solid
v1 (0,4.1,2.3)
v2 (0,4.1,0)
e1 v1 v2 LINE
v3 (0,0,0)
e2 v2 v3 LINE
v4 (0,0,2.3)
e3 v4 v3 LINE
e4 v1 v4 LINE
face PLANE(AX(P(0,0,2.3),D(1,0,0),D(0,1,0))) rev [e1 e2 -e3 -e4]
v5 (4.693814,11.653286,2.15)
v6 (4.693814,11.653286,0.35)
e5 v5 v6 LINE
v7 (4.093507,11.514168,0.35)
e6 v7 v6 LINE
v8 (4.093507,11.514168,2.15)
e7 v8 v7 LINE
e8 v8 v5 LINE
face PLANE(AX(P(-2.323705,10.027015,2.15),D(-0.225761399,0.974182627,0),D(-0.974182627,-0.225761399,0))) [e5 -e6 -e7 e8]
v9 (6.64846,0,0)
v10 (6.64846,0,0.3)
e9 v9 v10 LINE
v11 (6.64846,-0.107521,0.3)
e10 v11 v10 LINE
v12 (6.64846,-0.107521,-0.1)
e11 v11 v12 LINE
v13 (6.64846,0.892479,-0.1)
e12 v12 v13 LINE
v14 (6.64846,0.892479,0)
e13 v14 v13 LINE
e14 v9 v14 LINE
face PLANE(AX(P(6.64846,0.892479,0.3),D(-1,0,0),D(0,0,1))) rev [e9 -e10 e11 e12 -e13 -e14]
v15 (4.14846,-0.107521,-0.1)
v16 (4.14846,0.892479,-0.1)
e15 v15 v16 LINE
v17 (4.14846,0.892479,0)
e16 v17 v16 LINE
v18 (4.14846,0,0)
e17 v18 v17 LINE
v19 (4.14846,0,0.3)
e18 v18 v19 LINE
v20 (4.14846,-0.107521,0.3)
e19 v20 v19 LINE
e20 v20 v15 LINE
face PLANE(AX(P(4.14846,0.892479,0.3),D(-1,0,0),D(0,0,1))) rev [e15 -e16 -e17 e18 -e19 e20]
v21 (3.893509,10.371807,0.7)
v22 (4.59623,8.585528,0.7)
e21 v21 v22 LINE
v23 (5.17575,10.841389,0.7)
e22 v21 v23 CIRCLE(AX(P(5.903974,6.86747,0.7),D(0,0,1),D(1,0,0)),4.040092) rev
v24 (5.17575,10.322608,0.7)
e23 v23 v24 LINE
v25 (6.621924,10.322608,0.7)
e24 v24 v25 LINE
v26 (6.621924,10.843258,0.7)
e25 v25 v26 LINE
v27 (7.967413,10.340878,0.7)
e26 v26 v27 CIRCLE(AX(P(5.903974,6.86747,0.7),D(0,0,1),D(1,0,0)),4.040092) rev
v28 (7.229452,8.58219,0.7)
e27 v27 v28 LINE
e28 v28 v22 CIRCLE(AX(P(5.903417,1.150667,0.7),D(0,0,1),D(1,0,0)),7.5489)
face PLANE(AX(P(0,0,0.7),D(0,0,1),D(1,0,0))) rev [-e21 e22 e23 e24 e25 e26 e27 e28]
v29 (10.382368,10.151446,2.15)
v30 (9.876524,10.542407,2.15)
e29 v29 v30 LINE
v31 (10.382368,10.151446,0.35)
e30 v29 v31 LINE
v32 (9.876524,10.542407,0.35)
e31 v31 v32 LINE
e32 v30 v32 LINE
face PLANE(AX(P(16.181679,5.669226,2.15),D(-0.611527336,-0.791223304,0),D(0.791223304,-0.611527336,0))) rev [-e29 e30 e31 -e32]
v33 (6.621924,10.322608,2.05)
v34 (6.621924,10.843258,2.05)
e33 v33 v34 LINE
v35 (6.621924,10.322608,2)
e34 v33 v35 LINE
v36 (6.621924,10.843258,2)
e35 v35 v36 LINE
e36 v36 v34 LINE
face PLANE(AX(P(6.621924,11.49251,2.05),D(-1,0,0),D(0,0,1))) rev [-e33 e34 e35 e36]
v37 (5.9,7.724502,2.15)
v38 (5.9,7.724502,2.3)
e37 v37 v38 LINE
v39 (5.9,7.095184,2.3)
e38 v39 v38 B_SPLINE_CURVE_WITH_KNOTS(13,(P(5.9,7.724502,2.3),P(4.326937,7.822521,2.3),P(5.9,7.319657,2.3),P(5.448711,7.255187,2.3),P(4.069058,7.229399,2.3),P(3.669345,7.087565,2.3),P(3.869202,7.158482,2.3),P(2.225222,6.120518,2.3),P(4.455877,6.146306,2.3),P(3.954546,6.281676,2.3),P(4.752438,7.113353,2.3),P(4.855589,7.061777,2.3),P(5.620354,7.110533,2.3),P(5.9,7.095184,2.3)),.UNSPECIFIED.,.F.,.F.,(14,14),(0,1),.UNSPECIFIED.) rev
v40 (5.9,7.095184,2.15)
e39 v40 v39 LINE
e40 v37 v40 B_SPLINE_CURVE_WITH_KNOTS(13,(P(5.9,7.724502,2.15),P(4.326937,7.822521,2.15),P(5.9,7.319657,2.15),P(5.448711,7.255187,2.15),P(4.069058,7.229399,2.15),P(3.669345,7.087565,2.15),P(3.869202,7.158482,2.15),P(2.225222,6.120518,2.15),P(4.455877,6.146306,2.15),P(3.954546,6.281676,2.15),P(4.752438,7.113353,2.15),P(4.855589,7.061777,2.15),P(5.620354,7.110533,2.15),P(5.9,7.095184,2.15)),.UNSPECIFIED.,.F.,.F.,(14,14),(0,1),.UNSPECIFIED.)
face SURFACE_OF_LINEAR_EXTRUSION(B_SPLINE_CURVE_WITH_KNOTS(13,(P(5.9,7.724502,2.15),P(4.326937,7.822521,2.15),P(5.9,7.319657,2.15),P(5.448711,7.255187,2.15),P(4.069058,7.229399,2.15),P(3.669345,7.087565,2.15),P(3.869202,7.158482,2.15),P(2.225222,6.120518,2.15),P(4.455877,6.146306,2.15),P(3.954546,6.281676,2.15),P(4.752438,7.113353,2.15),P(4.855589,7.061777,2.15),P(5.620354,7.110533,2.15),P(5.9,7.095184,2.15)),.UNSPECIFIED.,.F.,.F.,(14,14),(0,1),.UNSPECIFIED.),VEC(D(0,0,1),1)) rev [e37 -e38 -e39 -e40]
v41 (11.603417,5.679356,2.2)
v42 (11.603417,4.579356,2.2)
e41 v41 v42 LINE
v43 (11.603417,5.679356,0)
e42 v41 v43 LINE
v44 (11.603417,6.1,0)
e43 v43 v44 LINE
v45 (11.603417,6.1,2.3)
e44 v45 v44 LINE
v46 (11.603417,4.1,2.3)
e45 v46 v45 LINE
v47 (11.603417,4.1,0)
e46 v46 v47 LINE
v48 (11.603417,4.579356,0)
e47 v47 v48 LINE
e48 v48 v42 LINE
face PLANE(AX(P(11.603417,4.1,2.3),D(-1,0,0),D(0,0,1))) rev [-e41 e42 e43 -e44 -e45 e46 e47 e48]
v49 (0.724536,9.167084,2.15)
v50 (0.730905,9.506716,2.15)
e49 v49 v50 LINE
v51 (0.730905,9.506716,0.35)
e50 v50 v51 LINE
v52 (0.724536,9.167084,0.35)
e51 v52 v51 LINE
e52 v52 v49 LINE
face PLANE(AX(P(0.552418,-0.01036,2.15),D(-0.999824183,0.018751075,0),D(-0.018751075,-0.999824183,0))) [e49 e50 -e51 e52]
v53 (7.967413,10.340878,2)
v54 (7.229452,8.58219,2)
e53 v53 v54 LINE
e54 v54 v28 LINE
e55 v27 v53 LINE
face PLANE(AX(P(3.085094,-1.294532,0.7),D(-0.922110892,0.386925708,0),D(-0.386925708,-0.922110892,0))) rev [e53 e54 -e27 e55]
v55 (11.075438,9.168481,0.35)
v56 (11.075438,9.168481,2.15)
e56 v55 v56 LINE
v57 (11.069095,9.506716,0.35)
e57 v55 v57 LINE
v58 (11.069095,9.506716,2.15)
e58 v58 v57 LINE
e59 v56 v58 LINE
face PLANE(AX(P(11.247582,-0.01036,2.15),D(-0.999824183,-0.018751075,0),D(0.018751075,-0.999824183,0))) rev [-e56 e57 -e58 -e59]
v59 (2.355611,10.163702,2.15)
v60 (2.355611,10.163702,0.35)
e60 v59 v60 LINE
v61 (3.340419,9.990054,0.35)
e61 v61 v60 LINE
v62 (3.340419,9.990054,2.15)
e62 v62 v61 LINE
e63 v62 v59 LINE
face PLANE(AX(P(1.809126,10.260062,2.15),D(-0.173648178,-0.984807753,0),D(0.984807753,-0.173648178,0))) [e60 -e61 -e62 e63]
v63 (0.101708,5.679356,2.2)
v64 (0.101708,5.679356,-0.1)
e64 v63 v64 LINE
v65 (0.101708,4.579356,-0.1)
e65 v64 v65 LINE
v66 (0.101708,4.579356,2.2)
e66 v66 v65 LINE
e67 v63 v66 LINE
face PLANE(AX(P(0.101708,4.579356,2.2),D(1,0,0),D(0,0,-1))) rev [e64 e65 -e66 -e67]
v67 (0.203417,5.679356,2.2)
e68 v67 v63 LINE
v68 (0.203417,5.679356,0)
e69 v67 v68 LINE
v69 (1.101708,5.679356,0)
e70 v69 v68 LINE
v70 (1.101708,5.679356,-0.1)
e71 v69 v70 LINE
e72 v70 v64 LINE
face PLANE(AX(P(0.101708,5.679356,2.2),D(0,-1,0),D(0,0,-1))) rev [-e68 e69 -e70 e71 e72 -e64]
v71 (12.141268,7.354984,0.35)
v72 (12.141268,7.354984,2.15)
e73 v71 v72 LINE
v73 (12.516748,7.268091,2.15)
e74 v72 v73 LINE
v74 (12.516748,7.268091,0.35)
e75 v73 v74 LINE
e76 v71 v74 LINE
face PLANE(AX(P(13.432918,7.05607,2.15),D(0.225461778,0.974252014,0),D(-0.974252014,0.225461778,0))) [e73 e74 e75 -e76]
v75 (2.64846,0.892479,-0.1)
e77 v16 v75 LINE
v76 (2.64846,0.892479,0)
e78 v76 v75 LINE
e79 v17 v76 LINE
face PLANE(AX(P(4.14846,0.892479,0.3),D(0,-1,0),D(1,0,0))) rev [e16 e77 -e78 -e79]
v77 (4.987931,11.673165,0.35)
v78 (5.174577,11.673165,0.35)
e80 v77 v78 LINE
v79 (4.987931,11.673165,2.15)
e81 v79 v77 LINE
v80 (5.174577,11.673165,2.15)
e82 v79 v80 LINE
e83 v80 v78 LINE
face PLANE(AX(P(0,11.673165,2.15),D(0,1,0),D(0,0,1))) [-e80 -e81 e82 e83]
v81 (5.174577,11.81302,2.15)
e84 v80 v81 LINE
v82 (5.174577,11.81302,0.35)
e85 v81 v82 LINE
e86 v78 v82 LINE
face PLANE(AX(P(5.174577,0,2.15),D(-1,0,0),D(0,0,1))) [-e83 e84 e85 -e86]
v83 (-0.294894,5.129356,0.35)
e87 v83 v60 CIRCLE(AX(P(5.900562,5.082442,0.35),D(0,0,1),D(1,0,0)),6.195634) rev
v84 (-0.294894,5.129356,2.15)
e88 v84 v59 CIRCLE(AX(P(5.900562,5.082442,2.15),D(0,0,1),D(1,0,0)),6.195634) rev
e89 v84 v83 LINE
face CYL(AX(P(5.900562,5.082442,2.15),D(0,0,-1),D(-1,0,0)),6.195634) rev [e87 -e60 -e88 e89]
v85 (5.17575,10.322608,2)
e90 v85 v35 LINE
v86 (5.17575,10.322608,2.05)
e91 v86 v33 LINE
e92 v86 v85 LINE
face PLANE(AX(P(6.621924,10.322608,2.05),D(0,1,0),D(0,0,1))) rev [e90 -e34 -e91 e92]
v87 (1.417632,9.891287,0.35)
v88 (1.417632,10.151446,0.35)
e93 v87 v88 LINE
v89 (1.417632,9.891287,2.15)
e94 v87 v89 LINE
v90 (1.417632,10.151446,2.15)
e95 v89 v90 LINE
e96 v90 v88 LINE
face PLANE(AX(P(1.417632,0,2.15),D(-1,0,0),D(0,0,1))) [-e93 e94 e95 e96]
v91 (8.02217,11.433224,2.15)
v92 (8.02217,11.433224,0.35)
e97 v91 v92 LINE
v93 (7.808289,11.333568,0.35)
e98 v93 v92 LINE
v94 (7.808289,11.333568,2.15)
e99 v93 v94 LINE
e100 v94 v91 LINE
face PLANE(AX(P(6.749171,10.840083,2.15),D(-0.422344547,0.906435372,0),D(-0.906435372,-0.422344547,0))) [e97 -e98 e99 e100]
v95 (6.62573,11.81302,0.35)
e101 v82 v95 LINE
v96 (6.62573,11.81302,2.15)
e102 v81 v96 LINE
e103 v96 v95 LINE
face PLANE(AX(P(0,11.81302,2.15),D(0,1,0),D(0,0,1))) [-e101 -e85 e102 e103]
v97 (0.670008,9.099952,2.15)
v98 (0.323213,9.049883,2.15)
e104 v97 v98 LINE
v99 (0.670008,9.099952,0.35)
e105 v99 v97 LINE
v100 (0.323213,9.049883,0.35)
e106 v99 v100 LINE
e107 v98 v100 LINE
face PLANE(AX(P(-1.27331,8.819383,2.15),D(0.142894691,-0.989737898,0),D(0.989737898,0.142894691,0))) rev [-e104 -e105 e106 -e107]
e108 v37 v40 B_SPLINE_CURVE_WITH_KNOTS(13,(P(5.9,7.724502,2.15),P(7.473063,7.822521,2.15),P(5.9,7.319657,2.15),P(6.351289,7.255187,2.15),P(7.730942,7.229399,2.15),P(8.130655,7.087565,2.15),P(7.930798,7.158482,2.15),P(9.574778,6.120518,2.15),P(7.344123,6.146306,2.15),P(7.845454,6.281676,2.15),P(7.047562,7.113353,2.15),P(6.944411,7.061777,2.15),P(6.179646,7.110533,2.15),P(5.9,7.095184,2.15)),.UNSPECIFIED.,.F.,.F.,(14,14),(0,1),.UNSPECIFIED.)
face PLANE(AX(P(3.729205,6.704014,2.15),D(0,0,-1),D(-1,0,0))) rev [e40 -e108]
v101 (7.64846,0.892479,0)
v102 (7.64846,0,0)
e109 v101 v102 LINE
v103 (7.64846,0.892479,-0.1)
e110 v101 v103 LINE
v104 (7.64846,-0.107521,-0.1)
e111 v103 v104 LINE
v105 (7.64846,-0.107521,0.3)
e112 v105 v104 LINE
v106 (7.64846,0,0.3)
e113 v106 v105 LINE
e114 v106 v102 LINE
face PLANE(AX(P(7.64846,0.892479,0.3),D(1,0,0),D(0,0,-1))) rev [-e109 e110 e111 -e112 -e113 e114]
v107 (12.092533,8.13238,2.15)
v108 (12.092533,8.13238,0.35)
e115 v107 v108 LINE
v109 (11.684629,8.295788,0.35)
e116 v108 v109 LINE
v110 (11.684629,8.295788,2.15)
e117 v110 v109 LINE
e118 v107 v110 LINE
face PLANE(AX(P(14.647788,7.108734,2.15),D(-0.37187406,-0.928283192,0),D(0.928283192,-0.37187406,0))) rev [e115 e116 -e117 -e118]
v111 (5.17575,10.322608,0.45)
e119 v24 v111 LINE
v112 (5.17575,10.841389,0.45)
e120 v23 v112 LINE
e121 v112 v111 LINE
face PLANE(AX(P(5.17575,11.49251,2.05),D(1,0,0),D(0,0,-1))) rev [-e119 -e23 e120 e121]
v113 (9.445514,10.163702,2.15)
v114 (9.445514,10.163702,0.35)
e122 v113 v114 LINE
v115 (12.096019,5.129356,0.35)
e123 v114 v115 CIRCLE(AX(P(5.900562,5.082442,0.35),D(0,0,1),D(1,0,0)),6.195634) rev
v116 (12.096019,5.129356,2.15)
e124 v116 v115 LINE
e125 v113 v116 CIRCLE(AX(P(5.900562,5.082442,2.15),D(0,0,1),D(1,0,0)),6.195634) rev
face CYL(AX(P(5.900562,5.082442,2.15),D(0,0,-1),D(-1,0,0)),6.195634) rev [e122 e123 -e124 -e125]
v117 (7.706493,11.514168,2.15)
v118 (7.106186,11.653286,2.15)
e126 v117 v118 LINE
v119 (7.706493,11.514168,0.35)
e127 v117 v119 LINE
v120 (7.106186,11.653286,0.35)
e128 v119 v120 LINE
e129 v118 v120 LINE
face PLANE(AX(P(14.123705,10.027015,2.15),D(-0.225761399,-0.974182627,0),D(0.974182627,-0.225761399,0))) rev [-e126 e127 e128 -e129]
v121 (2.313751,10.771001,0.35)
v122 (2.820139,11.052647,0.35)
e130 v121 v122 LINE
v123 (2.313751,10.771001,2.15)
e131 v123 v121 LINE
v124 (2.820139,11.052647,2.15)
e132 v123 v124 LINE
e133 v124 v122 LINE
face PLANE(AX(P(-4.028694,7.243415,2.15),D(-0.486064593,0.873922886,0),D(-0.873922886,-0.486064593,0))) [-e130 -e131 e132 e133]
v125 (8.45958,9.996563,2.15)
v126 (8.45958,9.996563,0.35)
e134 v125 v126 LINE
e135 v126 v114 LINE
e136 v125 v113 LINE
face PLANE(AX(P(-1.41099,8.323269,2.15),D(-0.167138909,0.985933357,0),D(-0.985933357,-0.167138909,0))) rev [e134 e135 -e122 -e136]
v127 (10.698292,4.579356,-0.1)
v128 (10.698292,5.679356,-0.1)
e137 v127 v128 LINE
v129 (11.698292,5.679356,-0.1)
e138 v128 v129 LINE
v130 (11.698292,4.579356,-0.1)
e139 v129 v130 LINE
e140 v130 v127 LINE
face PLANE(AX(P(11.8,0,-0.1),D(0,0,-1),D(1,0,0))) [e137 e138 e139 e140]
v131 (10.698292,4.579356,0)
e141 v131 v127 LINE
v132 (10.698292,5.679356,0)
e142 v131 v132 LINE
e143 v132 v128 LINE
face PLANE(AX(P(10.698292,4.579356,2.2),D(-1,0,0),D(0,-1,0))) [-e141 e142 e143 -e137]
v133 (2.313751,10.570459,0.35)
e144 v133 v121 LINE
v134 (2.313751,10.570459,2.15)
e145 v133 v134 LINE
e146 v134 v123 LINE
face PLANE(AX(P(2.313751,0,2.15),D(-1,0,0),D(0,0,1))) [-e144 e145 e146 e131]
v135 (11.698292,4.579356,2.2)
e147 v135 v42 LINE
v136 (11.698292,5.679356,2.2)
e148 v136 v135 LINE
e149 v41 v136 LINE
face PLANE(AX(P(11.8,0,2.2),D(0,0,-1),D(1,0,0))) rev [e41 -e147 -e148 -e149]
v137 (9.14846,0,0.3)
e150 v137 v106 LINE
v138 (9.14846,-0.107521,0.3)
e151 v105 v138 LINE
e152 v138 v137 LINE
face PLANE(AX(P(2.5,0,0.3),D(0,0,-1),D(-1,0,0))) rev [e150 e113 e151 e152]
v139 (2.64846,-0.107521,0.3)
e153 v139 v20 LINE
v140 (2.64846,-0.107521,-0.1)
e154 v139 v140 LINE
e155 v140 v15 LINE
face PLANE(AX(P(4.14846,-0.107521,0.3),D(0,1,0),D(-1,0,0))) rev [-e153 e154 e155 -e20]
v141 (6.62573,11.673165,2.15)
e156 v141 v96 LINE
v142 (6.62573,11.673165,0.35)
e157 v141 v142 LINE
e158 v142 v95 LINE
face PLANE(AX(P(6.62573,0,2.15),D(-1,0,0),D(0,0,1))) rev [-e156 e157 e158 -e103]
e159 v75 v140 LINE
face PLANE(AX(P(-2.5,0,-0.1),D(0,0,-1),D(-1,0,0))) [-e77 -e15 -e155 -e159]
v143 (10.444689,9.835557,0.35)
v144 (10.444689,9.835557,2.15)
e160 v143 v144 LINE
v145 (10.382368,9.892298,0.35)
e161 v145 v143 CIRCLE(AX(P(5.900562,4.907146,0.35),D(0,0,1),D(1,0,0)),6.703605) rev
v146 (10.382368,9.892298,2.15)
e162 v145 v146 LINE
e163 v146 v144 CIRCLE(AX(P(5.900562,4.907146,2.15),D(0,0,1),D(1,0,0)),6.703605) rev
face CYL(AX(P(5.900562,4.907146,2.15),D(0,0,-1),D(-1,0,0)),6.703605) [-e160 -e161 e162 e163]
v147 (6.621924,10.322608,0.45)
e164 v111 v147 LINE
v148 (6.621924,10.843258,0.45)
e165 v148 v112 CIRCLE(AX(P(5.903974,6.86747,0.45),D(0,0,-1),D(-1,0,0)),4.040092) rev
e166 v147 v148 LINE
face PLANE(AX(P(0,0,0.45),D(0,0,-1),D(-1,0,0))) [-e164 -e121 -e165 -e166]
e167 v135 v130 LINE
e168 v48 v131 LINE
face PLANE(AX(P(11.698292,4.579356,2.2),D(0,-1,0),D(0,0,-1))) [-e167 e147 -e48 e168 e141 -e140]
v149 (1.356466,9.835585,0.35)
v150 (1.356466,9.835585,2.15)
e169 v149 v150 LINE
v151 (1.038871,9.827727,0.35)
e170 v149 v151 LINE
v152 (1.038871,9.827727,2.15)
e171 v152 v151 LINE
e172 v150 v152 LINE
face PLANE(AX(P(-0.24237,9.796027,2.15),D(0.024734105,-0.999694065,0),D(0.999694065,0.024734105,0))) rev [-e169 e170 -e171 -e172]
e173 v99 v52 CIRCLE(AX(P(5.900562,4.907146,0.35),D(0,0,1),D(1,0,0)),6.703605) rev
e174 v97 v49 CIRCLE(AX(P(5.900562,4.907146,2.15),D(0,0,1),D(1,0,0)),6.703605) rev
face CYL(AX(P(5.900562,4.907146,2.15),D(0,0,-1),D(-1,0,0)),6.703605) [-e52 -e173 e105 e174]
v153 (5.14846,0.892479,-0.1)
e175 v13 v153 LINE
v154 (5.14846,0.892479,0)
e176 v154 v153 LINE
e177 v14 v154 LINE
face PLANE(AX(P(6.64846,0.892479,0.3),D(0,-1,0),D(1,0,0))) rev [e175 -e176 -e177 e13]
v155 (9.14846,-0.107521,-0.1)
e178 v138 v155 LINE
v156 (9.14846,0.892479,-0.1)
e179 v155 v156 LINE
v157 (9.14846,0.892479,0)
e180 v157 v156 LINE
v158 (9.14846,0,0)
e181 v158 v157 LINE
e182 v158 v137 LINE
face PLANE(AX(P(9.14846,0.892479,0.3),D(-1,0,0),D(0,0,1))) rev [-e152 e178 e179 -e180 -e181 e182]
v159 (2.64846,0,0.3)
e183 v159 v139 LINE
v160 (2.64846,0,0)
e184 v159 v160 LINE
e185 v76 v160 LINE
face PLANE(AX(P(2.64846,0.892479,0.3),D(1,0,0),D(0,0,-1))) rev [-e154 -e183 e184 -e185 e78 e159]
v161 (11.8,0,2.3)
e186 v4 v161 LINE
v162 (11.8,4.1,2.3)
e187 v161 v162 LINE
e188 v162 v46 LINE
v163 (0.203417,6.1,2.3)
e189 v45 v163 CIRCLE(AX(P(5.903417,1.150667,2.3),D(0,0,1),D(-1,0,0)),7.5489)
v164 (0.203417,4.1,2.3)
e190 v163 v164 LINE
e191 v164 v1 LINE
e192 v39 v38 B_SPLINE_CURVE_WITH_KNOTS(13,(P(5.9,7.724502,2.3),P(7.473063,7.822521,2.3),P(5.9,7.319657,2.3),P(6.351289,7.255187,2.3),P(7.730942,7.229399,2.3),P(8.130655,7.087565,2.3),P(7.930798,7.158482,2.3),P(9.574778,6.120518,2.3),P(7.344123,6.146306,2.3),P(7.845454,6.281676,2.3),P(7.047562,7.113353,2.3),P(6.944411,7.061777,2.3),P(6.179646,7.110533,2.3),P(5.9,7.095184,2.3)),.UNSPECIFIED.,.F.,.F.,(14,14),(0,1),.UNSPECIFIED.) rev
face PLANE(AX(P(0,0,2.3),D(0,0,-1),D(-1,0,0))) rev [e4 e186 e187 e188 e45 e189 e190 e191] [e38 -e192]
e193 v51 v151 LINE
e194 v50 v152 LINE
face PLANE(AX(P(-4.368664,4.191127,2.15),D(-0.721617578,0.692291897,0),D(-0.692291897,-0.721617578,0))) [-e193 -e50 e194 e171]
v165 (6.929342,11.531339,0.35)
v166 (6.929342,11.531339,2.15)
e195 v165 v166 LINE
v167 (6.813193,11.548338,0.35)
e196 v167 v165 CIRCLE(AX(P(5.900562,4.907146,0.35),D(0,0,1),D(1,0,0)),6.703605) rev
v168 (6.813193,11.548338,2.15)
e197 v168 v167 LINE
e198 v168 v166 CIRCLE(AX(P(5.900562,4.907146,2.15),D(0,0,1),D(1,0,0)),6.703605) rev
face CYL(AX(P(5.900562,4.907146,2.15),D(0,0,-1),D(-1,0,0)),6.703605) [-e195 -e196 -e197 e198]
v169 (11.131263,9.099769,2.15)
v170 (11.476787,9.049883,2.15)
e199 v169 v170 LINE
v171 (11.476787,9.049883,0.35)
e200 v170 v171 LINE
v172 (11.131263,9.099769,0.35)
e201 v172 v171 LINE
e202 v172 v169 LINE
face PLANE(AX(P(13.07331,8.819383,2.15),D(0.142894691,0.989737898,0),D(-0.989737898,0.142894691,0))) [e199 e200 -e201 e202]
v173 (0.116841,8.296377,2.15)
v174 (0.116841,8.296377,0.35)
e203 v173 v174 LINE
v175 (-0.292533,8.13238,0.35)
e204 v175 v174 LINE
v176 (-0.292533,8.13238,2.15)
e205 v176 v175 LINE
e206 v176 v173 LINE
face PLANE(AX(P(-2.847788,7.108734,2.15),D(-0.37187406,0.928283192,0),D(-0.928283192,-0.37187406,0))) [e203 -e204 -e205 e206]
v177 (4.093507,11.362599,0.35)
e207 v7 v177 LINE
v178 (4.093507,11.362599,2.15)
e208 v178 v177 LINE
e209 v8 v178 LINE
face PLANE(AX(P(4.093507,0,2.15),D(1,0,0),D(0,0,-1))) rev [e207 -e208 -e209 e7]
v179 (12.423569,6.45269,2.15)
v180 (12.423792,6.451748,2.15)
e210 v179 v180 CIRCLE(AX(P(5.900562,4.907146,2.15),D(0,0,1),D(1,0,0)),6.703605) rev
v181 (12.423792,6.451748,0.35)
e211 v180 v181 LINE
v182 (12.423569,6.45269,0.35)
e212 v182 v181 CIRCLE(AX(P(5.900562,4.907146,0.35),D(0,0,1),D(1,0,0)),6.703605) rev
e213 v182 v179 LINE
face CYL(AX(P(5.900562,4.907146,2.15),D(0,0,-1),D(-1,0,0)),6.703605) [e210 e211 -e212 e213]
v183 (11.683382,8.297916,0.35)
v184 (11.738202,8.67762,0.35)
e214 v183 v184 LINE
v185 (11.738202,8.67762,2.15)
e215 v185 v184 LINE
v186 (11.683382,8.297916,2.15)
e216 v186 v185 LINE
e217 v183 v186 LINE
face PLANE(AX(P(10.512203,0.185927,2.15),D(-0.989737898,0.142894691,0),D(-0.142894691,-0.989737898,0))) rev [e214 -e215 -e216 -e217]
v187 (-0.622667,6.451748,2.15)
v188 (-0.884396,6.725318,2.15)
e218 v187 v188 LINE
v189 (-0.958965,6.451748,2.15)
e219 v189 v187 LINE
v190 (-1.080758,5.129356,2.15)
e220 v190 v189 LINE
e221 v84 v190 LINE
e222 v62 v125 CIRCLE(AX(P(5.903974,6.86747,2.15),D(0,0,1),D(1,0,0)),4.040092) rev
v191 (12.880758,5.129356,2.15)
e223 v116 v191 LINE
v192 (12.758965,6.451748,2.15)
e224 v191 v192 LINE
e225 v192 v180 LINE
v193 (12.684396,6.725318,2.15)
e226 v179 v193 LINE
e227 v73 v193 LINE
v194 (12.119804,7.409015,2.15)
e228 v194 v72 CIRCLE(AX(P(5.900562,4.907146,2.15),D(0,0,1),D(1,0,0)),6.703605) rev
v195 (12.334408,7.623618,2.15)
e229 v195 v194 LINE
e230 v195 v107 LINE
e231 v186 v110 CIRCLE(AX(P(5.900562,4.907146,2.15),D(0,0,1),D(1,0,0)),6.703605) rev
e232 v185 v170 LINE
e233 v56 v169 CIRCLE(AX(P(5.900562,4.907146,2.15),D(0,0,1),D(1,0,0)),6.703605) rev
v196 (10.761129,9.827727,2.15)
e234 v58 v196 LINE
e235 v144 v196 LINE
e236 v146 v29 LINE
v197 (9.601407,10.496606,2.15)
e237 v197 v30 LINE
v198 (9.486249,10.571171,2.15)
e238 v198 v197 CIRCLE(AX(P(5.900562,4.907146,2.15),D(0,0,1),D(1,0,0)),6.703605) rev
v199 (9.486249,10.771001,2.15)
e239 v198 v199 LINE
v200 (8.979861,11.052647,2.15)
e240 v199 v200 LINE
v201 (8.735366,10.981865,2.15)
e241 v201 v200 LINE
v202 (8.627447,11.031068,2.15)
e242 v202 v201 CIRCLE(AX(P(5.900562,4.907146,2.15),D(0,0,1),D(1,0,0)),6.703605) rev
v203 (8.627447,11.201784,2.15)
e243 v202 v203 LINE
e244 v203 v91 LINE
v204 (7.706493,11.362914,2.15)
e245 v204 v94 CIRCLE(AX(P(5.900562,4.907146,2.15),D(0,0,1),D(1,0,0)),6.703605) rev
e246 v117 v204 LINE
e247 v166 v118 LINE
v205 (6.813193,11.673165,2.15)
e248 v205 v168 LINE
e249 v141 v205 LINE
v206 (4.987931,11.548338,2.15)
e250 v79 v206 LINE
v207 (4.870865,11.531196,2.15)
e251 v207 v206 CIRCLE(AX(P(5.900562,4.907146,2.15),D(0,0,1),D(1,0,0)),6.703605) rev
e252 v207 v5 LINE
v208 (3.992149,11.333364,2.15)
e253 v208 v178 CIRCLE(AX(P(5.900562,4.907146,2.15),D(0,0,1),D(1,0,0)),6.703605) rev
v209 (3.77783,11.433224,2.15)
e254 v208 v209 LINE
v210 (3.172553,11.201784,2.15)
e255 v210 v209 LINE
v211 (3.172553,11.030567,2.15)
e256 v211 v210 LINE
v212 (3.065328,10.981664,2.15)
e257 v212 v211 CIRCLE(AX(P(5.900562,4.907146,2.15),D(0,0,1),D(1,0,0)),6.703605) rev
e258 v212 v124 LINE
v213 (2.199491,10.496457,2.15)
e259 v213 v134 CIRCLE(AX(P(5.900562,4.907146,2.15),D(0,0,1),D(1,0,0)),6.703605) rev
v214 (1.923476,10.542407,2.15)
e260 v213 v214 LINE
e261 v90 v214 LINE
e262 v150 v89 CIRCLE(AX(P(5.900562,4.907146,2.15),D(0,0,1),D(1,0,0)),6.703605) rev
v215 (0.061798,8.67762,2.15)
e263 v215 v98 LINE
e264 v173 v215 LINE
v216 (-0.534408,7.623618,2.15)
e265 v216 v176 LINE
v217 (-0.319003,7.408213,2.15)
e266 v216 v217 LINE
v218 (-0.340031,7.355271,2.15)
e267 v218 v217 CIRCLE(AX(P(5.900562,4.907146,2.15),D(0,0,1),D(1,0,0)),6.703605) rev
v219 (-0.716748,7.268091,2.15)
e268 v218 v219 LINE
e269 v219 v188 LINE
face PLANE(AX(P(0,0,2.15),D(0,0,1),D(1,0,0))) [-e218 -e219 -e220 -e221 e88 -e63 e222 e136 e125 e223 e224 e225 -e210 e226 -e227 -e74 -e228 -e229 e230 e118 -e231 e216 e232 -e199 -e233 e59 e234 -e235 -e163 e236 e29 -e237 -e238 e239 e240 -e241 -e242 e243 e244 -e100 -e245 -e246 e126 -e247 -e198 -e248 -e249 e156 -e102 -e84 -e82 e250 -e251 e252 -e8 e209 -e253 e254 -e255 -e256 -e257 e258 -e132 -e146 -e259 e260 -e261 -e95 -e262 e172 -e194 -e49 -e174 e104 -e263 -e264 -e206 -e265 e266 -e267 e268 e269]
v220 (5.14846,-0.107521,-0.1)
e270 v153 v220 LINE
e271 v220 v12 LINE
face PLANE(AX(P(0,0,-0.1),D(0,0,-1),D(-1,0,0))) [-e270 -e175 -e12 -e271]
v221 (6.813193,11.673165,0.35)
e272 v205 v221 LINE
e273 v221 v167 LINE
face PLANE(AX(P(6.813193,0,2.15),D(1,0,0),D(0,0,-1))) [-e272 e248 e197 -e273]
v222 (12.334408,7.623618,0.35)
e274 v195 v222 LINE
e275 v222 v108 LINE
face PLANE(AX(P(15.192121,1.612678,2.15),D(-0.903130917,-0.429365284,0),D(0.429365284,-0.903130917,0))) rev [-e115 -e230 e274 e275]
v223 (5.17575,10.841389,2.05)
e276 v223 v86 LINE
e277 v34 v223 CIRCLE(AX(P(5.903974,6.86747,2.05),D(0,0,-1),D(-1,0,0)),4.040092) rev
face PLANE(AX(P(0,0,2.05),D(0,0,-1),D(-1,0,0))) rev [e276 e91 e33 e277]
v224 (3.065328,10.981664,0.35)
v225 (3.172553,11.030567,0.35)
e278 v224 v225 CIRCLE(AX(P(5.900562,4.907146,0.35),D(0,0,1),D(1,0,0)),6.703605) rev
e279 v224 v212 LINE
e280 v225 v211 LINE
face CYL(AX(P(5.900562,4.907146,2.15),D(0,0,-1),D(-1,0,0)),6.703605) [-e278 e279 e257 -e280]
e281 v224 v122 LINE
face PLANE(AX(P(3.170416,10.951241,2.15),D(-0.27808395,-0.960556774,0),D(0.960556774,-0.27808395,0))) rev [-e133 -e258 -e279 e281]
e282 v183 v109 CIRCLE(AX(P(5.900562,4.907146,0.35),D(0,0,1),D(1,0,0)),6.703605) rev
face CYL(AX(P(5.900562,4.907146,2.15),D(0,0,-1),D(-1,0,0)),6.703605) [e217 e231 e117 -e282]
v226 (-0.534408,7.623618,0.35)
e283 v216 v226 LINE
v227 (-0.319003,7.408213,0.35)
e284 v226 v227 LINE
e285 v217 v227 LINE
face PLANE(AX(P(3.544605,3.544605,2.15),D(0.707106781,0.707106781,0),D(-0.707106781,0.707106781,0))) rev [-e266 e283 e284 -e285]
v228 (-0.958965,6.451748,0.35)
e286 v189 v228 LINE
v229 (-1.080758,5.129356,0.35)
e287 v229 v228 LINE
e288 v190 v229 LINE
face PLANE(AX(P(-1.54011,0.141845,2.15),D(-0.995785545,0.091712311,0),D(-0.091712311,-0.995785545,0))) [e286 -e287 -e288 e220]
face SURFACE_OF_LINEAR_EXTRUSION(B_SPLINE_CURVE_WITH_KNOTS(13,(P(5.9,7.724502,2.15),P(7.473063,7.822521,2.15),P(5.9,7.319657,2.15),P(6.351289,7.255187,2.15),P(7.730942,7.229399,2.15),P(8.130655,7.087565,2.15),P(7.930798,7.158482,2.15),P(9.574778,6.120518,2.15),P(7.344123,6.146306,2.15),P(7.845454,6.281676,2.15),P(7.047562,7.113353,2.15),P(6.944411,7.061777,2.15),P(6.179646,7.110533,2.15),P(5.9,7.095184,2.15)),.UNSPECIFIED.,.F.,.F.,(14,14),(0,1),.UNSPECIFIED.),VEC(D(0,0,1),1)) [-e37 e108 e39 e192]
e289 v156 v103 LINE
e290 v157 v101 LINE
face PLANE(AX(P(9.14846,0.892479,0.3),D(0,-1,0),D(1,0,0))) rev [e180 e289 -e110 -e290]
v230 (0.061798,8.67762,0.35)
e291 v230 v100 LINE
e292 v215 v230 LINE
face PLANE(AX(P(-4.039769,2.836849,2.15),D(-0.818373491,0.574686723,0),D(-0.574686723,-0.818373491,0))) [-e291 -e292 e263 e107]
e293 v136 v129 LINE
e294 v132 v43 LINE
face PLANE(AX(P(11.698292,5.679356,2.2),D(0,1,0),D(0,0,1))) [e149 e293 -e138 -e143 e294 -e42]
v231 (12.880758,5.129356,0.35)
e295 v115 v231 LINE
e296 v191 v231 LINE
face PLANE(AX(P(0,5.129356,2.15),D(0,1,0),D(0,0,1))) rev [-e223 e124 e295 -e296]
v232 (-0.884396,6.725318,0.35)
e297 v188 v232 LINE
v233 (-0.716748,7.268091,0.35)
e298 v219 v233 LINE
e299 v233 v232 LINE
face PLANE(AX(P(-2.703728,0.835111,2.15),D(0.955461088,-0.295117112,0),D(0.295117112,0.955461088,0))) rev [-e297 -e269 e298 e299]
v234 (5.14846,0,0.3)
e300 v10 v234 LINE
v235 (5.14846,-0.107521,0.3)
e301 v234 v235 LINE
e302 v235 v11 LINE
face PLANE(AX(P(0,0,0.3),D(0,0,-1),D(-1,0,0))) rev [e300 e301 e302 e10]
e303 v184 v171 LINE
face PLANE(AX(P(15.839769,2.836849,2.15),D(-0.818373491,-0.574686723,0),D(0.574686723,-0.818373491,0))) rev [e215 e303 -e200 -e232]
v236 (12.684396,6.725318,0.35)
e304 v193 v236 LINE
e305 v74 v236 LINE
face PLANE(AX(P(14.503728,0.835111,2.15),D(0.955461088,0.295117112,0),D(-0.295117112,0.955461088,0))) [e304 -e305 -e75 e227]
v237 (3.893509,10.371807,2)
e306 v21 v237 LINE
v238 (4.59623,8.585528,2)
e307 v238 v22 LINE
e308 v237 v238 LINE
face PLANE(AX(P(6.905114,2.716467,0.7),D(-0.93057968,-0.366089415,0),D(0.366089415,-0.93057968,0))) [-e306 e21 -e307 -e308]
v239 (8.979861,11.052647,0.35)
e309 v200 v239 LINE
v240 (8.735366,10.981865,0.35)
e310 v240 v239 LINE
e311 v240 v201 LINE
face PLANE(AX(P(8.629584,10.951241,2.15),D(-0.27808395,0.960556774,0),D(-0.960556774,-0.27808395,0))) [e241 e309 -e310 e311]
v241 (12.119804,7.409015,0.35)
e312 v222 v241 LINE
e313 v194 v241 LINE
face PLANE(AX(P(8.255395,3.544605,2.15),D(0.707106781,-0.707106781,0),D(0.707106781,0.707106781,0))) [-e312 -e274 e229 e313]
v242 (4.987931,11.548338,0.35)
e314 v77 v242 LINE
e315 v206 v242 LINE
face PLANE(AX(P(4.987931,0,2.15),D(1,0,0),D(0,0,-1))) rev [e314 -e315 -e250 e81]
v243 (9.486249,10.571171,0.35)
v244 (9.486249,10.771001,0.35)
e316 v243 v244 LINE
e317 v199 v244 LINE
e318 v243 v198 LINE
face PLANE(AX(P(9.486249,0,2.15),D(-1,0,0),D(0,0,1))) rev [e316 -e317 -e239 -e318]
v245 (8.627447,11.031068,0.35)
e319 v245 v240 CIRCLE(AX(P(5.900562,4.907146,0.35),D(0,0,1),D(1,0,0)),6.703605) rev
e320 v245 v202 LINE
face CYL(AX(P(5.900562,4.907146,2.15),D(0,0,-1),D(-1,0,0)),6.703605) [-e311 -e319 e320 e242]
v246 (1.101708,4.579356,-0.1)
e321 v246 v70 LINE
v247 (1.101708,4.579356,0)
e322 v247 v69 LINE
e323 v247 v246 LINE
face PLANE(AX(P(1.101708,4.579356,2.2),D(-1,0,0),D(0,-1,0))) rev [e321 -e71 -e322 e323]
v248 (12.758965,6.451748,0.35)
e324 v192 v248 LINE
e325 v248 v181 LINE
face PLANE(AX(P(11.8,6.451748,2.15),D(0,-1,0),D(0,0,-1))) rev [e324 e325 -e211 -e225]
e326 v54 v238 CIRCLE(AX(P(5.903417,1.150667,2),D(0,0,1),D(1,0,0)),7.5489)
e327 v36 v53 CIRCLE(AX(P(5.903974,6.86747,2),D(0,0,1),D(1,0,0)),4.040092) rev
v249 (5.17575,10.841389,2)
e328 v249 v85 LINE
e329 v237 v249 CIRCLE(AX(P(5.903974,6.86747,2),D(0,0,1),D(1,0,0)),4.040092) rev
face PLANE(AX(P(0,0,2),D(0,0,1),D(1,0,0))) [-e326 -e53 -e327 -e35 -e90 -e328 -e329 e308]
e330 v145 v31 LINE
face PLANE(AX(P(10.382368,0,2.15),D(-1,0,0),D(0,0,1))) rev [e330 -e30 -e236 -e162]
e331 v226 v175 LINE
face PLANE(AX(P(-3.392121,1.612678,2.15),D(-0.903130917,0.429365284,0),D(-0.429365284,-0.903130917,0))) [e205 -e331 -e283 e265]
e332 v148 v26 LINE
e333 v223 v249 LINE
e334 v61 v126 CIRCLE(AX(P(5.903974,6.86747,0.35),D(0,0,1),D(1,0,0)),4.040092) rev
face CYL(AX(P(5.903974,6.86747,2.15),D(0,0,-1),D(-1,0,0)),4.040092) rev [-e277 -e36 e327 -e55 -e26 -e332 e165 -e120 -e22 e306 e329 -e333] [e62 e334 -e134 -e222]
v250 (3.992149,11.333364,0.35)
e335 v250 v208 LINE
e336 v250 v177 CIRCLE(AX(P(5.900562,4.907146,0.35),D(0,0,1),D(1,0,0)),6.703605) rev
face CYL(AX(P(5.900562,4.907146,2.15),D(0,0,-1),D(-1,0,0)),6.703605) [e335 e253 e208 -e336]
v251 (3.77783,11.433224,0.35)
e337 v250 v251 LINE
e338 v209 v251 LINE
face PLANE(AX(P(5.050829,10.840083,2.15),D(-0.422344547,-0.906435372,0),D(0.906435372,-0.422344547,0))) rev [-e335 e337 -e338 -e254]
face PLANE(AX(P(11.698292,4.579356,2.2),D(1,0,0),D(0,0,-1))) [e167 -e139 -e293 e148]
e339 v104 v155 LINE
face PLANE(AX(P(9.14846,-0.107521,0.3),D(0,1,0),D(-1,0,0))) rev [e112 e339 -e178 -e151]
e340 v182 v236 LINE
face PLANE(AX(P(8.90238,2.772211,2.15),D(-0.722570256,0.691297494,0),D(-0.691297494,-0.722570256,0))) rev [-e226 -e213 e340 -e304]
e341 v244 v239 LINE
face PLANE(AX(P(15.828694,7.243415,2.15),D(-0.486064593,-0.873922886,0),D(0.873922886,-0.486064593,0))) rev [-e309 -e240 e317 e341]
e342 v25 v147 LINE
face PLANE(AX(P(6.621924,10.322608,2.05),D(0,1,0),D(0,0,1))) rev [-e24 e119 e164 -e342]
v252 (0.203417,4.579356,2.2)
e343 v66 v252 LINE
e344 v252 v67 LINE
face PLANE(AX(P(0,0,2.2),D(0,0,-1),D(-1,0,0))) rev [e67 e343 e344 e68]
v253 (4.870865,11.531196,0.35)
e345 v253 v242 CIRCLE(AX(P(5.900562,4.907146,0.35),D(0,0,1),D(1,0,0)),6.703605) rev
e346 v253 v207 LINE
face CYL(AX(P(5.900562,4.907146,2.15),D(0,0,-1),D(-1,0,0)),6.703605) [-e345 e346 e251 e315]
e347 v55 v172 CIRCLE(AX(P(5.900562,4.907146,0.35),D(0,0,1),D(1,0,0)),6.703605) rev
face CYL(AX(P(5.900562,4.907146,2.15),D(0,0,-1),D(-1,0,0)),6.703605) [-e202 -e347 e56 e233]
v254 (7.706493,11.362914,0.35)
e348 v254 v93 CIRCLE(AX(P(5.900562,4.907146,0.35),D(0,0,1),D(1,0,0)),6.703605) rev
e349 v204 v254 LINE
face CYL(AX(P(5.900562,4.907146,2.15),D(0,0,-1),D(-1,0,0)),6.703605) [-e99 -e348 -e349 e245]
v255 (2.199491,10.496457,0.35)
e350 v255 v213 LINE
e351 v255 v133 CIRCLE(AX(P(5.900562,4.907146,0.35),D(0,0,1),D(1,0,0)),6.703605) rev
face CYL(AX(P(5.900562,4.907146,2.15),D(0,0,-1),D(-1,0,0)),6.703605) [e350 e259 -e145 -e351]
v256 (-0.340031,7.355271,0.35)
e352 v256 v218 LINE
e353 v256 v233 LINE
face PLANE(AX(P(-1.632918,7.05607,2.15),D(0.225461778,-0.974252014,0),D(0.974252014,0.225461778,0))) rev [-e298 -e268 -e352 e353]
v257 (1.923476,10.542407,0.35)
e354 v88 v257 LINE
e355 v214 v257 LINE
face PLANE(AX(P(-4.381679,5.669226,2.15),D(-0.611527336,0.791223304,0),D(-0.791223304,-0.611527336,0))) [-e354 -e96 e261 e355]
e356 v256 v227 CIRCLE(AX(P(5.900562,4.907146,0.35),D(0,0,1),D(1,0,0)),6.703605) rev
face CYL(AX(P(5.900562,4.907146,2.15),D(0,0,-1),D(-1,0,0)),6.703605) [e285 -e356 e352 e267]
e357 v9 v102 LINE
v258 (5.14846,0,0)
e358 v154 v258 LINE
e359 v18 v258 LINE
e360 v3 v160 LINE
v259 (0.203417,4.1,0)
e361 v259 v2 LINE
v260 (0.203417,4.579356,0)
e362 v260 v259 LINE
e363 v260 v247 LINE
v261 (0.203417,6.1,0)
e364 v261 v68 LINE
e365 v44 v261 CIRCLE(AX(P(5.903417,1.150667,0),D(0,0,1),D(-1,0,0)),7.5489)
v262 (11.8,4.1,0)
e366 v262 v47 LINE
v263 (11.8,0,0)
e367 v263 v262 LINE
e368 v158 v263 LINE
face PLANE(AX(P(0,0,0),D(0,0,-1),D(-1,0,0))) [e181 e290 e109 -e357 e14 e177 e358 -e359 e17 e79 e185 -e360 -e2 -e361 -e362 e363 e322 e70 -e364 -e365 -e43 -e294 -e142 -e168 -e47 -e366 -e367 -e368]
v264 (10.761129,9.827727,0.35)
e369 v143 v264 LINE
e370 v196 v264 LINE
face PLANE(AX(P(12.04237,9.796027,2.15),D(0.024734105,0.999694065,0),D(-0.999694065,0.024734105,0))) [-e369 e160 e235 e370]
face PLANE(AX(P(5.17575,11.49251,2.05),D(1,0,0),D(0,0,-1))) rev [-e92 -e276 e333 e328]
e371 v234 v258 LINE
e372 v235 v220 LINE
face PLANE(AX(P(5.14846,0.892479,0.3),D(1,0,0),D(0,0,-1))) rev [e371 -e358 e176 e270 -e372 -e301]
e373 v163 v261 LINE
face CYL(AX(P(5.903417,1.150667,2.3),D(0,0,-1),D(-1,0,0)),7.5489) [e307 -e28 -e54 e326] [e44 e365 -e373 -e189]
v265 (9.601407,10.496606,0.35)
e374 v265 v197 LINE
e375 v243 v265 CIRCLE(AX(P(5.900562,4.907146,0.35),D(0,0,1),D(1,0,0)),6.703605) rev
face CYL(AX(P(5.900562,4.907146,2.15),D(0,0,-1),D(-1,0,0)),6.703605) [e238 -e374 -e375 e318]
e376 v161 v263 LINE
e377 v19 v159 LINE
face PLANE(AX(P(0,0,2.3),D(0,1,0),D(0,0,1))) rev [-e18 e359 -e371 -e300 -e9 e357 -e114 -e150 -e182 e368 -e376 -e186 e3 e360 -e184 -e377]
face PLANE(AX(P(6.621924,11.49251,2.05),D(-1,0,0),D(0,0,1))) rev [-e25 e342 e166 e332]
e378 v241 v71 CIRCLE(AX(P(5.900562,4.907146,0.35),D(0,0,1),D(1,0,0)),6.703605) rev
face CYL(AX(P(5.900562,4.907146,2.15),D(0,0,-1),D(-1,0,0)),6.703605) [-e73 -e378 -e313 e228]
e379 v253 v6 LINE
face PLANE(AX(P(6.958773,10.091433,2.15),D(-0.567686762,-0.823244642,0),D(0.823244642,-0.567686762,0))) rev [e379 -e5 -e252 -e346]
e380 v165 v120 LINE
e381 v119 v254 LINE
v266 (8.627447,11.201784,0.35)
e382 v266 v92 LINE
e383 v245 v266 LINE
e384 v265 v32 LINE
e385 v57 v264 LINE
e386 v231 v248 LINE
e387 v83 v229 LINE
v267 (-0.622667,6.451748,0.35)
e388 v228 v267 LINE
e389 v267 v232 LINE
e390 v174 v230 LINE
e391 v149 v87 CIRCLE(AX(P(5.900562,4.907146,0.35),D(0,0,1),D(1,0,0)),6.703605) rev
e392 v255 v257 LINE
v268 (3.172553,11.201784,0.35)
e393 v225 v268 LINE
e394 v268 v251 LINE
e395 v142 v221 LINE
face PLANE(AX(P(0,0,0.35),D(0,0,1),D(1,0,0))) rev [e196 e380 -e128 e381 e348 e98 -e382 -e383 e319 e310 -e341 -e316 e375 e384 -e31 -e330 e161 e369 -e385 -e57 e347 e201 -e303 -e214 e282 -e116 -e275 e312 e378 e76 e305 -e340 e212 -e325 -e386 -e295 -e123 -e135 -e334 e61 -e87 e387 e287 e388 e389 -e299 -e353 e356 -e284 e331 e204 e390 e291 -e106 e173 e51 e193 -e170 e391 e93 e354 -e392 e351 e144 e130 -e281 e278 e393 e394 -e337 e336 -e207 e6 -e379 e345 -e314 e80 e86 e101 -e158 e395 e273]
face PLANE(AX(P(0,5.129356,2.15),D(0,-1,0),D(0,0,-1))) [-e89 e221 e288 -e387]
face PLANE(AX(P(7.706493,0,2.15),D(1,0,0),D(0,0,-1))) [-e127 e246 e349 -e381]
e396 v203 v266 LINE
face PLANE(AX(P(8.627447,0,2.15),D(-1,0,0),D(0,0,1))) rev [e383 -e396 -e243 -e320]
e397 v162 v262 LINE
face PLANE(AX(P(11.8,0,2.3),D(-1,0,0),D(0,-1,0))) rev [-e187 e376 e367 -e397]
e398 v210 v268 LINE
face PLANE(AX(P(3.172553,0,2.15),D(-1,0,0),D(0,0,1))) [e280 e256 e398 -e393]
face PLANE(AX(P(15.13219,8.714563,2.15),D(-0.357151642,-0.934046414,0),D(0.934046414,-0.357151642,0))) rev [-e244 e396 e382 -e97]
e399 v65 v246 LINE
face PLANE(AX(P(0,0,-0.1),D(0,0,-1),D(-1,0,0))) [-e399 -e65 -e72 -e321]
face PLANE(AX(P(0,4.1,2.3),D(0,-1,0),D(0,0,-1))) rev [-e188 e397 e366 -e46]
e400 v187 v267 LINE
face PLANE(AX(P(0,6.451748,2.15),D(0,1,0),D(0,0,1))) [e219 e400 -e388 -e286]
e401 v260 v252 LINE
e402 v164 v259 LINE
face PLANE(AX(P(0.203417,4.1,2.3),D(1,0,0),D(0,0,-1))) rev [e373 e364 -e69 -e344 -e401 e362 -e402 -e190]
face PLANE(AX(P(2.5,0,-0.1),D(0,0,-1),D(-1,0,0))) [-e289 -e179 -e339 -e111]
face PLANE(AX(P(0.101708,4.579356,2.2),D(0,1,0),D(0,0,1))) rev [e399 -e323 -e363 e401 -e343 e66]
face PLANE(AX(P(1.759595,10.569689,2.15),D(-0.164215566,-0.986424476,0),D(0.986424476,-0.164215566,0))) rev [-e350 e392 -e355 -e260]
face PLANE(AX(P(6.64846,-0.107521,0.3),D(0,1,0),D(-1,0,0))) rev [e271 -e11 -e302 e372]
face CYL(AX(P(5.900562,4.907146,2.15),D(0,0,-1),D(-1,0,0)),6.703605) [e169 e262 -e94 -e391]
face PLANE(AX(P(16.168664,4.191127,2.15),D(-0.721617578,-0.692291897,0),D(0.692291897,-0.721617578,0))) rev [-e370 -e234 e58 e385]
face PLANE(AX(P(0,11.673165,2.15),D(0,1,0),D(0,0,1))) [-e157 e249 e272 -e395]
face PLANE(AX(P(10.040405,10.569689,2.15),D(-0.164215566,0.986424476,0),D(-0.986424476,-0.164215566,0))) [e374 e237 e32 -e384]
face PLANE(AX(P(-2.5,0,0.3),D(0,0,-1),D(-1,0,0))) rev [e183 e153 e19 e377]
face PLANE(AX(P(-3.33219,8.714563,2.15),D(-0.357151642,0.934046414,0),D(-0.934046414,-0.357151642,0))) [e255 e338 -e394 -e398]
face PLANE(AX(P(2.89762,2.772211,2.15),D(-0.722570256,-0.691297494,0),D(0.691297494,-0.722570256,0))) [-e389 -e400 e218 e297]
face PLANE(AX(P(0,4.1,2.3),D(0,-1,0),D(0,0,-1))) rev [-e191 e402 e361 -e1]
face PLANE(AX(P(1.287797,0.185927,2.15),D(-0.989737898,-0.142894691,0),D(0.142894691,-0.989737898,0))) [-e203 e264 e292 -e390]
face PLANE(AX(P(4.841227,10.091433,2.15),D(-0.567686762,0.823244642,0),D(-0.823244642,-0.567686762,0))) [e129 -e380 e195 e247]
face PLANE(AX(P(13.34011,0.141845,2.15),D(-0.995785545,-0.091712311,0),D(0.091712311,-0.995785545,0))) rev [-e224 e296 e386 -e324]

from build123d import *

# Parameters (mm, degrees)
SKETCH1_W            = 11.8
SKETCH1_H            = 4.1
BOSS_EXTRUDE1_DEPTH  = 2.3
SKETCH2_W            = 11.4
SKETCH2_H            = 2
BOSS_EXTRUDE2_DEPTH  = 2.3
BOSS_EXTRUDE3_START  = -0.1
SKETCH3_W            = 1
SKETCH3_H            = 1.1
BOSS_EXTRUDE3_DEPTH  = 2.3
BOSS_EXTRUDE4_START  = -0.1
SKETCH4_W            = 1.5
SKETCH4_H            = 1
BOSS_EXTRUDE4_DEPTH  = 0.4
LPATTERN1_COUNT      = 2
LPATTERN1_PITCH      = 2.5
LPATTERN1_COL_COUNT  = 2
LPATTERN1_COL_PITCH  = 2.5
BOSS_EXTRUDE5_DEPTH  = 2.3
CUT_EXTRUDE1_START   = 2.15
CUT_EXTRUDE1_DEPTH   = 0.15
BOSS_EXTRUDE6_START  = 0.1
SKETCH9_W            = 1.451153264
SKETCH9_H            = 0.139855477
SKETCH9_H_2          = 0.01502842
BOSS_EXTRUDE6_DEPTH  = 0.9
BOSS_EXTRUDE7_START  = 0.2
BOSS_EXTRUDE7_DEPTH  = 0.65
BOSS_EXTRUDE8_START  = 0.1
SKETCH12_W           = 1.44617415
SKETCH12_H           = 1.169902142
BOSS_EXTRUDE8_DEPTH  = 0.8
BOSS_EXTRUDE9_START  = 0.1
BOSS_EXTRUDE9_DEPTH  = 0.9
BOSS_EXTRUDE11_START = 0.1
BOSS_EXTRUDE11_DEPTH = 0.9


# Read off the part's stored shape, not the designer's step: Cut-Extrude1
with BuildPart() as part:
    # Sketch1 → Boss-Extrude1 (new body)
    with BuildSketch(Plane.XY):
        with Locations((5.9, 2.05)):
            Rectangle(SKETCH1_W, SKETCH1_H)
    extrude(amount=BOSS_EXTRUDE1_DEPTH)

    # Sketch2 → Boss-Extrude2 (add)
    with BuildSketch(Plane.XY):
        with Locations((5.903416876, 5.1)):
            Rectangle(SKETCH2_W, SKETCH2_H)
    extrude(amount=BOSS_EXTRUDE2_DEPTH)

    # Sketch3 → Boss-Extrude3 (add)
    with BuildSketch(Plane.XY.offset(BOSS_EXTRUDE3_START)):
        with Locations((0.601708438, 5.129355756)):
            Rectangle(SKETCH3_W, SKETCH3_H)
    boss_extrude3 = extrude(amount=BOSS_EXTRUDE3_DEPTH)

    # Mirror1: Boss-Extrude3 across plane
    add(boss_extrude3.mirror(Plane(origin=(5.9, 0, 0), x_dir=(0, 0, 1), z_dir=(1, 0, 0))))

    # Sketch4 → Boss-Extrude4 (add)
    with BuildSketch(Plane.XY.offset(BOSS_EXTRUDE4_START)):
        with Locations((5.898460375, 0.392479358)):
            Rectangle(SKETCH4_W, SKETCH4_H)
    boss_extrude4 = extrude(amount=BOSS_EXTRUDE4_DEPTH)

    # LPattern1: Boss-Extrude4 ×2
    with Locations(*[(i * LPATTERN1_PITCH, 0, 0) for i in range(1, LPATTERN1_COUNT)]):
        add(boss_extrude4)

    # LPattern1 col: Boss-Extrude4 ×2
    with Locations(*[(-i * LPATTERN1_COL_PITCH, 0, 0) for i in range(1, LPATTERN1_COL_COUNT)]):
        add(boss_extrude4)

    # Sketch7 → Boss-Extrude5 (add)
    with BuildSketch(Plane.XY):
        with BuildLine():
            Line((0.203416876, 6.1), (11.603416876, 6.1))
            ThreePointArc((11.603416876, 6.1), (5.903416876, 8.699567422), (0.203416876, 6.1))
        make_face()
    extrude(amount=BOSS_EXTRUDE5_DEPTH)

    # Cut-Extrude1 outline → Cut-Extrude1 (cut)
    with BuildSketch(Plane.XY.offset(CUT_EXTRUDE1_START)):
        with BuildLine():
            Line((5.9, 7.095183964), (5.9, 7.724501792))
            add(Edge.make_bspline(
                [(5.9, 7.724501792), (4.326937108, 7.822520939), (5.9, 7.319656572), (5.448711465, 7.255186781), (4.069057945, 7.229398865), (3.669345243, 7.087565325), (3.869201594, 7.158482095), (2.225221932, 6.120518466), (4.455876689, 6.146306382), (3.954545764, 6.281675552), (4.752437726, 7.113353242), (4.855589391, 7.061777409), (5.620353503, 7.110533179), (5.9, 7.095183964)],
                knots=[0, 0, 0, 0, 0, 0, 0, 0, 0, 0, 0, 0, 0, 0, 1, 1, 1, 1, 1, 1, 1, 1, 1, 1, 1, 1, 1, 1], degree=13))
        make_face()
    cut_extrude1 = extrude(amount=CUT_EXTRUDE1_DEPTH, mode=Mode.SUBTRACT)

    # Mirror2: Cut-Extrude1 across plane
    add(cut_extrude1.mirror(Plane(origin=(5.9, 0, 0), x_dir=(0, 0, 1), z_dir=(1, 0, 0))), mode=Mode.SUBTRACT)



with BuildPart() as body_2:
    # Sketch9 → Boss-Extrude6 (new, symmetric)
    with BuildSketch(Plane.XY.offset(1.15).offset(BOSS_EXTRUDE6_START)):
        with BuildLine():
            Line((2.355610817, 10.163701862), (3.34041857, 9.990053684))
            ThreePointArc((3.34041857, 9.990053684), (5.898836859, 10.90755899), (8.459580179, 9.996562953))
            Line((8.459580179, 9.996562953), (9.445513537, 10.163701862))
            ThreePointArc((9.445513537, 10.163701862), (5.900562177, 11.27807609), (2.355610817, 10.163701862))
        make_face()
        with BuildLine():
            ThreePointArc((-0.294894362, 5.129355756), (0.418313853, 7.968760684), (2.355610817, 10.163701862))
            ThreePointArc((2.355610817, 10.163701862), (5.900562177, 11.27807609), (9.445513537, 10.163701862))
            ThreePointArc((9.445513537, 10.163701862), (11.3828105, 7.968760684), (12.096018715, 5.129355756))
            Line((12.096018715, 5.129355756), (12.600483369, 5.129355756))
            ThreePointArc((12.600483369, 5.129355756), (10.879374358, 9.395993369), (6.813193458, 11.548337589))
            Line((6.813193458, 11.548337589), (6.625730117, 11.548337589))
            Line((6.625730117, 11.548337589), (6.625730117, 11.533309169))
            Line((6.625730117, 11.533309169), (5.174576853, 11.533309169))
            Line((5.174576853, 11.533309169), (5.174576853, 11.548337589))
            Line((5.174576853, 11.548337589), (4.987930896, 11.548337589))
            ThreePointArc((4.987930896, 11.548337589), (0.921749996, 9.395993369), (-0.799359016, 5.129355756))
            Line((-0.799359016, 5.129355756), (-0.294894362, 5.129355756))
        make_face()
        with Locations((5.900153485, 11.743092386)):
            Rectangle(SKETCH9_W, SKETCH9_H)
        with BuildLine():
            Line((5.174576853, 11.673164647), (5.174576853, 11.571323885))
            ThreePointArc((5.174576853, 11.571323885), (5.90015107, 11.610751105), (6.625730117, 11.571412879))
            Line((6.625730117, 11.571412879), (6.625730117, 11.673164647))
            Line((6.625730117, 11.673164647), (5.174576853, 11.673164647))
        make_face()
        with BuildLine():
            ThreePointArc((6.625730117, 11.571412879), (6.719543062, 11.560535503), (6.813193458, 11.548337589))
            Line((6.813193458, 11.548337589), (6.813193458, 11.673164647))
            Line((6.813193458, 11.673164647), (6.625730117, 11.673164647))
            Line((6.625730117, 11.673164647), (6.625730117, 11.571412879))
        make_face()
        with BuildLine():
            Line((4.987930896, 11.673164647), (4.987930896, 11.548337589))
            ThreePointArc((4.987930896, 11.548337589), (5.081173266, 11.560485266), (5.174576853, 11.571323885))
            Line((5.174576853, 11.571323885), (5.174576853, 11.673164647))
            Line((5.174576853, 11.673164647), (4.987930896, 11.673164647))
        make_face()
        with BuildLine():
            Line((5.174576853, 11.571323885), (5.174576853, 11.548337589))
            Line((5.174576853, 11.548337589), (6.625730117, 11.548337589))
            Line((6.625730117, 11.548337589), (6.625730117, 11.571412879))
            ThreePointArc((6.625730117, 11.571412879), (5.90015107, 11.610751105), (5.174576853, 11.571323885))
        make_face()
        with BuildLine():
            ThreePointArc((5.174576853, 11.571323885), (5.081173266, 11.560485266), (4.987930896, 11.548337589))
            Line((4.987930896, 11.548337589), (5.174576853, 11.548337589))
            Line((5.174576853, 11.548337589), (5.174576853, 11.571323885))
        make_face()
        with Locations((5.900153485, 11.540823379)):
            Rectangle(SKETCH9_W, SKETCH9_H_2)
        with BuildLine():
            Line((6.625730117, 11.548337589), (6.813193458, 11.548337589))
            ThreePointArc((6.813193458, 11.548337589), (6.719543062, 11.560535503), (6.625730117, 11.571412879))
            Line((6.625730117, 11.571412879), (6.625730117, 11.548337589))
        make_face()
    extrude(amount=BOSS_EXTRUDE6_DEPTH, both=True)



with BuildPart() as body_3:
    # Sketch11 → Boss-Extrude7 (new, symmetric)
    with BuildSketch(Plane.XY.offset(1.15).offset(BOSS_EXTRUDE7_START)):
        Polygon((8.224851185, 10.954397565), (5.972117123, 10.954397565), (3.66431816, 10.954397565), (4.823471696, 8.00789138), (5.903471696, 8.00789138), (6.988471696, 8.00789138), align=None)
    extrude(amount=BOSS_EXTRUDE7_DEPTH, both=True)


with BuildPart() as body_2_1:
    add(body_2.part)

    add(body_3.part)  # Boss-Extrude8 merges body 3
    # Sketch12 → Boss-Extrude8 (add, symmetric)
    with BuildSketch(Plane.XY.offset(1.15).offset(BOSS_EXTRUDE8_START)):
        with Locations((5.898836859, 10.90755899)):
            Rectangle(SKETCH12_W, SKETCH12_H)
    extrude(amount=BOSS_EXTRUDE8_DEPTH, both=True)

    # Sketch13 → Boss-Extrude9 (add, symmetric)
    with BuildSketch(Plane.XY.offset(1.15).offset(BOSS_EXTRUDE9_START)):
        Polygon((-1.08075819, 5.129355756), (-0.799359016, 5.129355756), (-0.671141909, 6.202084295), (-0.605509207, 6.451748475), (-0.958965207, 6.451748475), align=None)
    boss_extrude9 = extrude(amount=BOSS_EXTRUDE9_DEPTH, both=True)

    # Mirror3: Boss-Extrude9 across plane
    add(boss_extrude9.mirror(Plane(origin=(5.9, 0, 0), x_dir=(0, 0, 1), z_dir=(1, 0, 0))))


with BuildPart() as part_1:
    add(part.part)

    add(body_2_1.part)  # Boss-Extrude11 merges body 2
    # Sketch14 → Boss-Extrude11 (add, symmetric)
    with BuildSketch(Plane.XY.offset(1.15).offset(BOSS_EXTRUDE11_START)):
        Polygon((4.09350701, 11.514168222), (4.693813808, 11.65328598), (4.987930896, 11.450470962), (4.09350701, 11.286137141), align=None)
        Polygon((3.172552888, 11.201783695), (3.777829994, 11.433223707), (4.09350701, 11.286137141), (3.172552888, 10.950622256), align=None)
        Polygon((2.313751368, 10.77100106), (2.820138748, 11.052647163), (3.172552888, 10.950622256), (2.313751368, 10.477435247), align=None)
        Polygon((1.417632483, 10.151446182), (1.92347576, 10.542406597), (2.313751368, 10.477435247), (1.417632483, 9.837098648), align=None)
        Polygon((0.730905136, 9.506715824), (1.038871241, 9.827727461), (1.417632483, 9.837098648), (0.723421169, 9.107663948), align=None)
        Polygon((0.061798131, 8.677620181), (0.323212614, 9.049883319), (0.723421169, 9.107663948), (0.116840619, 8.296376932), align=None)
        Polygon((-0.534407657, 7.623618076), (-0.292532583, 8.132380345), (0.116840619, 8.296376932), (-0.279961599, 7.369172018), align=None)
        Polygon((-0.279961599, 7.369172018), (-0.716747876, 7.268090769), (-0.884396434, 6.725317521), (-0.622667426, 6.451748475), align=None)
    boss_extrude11 = extrude(amount=BOSS_EXTRUDE11_DEPTH, both=True)

    # Mirror4: Boss-Extrude11 across plane
    add(boss_extrude11.mirror(Plane(origin=(5.9, 0, 0), x_dir=(0, 0, 1), z_dir=(1, 0, 0))))


solid = part_1.part
